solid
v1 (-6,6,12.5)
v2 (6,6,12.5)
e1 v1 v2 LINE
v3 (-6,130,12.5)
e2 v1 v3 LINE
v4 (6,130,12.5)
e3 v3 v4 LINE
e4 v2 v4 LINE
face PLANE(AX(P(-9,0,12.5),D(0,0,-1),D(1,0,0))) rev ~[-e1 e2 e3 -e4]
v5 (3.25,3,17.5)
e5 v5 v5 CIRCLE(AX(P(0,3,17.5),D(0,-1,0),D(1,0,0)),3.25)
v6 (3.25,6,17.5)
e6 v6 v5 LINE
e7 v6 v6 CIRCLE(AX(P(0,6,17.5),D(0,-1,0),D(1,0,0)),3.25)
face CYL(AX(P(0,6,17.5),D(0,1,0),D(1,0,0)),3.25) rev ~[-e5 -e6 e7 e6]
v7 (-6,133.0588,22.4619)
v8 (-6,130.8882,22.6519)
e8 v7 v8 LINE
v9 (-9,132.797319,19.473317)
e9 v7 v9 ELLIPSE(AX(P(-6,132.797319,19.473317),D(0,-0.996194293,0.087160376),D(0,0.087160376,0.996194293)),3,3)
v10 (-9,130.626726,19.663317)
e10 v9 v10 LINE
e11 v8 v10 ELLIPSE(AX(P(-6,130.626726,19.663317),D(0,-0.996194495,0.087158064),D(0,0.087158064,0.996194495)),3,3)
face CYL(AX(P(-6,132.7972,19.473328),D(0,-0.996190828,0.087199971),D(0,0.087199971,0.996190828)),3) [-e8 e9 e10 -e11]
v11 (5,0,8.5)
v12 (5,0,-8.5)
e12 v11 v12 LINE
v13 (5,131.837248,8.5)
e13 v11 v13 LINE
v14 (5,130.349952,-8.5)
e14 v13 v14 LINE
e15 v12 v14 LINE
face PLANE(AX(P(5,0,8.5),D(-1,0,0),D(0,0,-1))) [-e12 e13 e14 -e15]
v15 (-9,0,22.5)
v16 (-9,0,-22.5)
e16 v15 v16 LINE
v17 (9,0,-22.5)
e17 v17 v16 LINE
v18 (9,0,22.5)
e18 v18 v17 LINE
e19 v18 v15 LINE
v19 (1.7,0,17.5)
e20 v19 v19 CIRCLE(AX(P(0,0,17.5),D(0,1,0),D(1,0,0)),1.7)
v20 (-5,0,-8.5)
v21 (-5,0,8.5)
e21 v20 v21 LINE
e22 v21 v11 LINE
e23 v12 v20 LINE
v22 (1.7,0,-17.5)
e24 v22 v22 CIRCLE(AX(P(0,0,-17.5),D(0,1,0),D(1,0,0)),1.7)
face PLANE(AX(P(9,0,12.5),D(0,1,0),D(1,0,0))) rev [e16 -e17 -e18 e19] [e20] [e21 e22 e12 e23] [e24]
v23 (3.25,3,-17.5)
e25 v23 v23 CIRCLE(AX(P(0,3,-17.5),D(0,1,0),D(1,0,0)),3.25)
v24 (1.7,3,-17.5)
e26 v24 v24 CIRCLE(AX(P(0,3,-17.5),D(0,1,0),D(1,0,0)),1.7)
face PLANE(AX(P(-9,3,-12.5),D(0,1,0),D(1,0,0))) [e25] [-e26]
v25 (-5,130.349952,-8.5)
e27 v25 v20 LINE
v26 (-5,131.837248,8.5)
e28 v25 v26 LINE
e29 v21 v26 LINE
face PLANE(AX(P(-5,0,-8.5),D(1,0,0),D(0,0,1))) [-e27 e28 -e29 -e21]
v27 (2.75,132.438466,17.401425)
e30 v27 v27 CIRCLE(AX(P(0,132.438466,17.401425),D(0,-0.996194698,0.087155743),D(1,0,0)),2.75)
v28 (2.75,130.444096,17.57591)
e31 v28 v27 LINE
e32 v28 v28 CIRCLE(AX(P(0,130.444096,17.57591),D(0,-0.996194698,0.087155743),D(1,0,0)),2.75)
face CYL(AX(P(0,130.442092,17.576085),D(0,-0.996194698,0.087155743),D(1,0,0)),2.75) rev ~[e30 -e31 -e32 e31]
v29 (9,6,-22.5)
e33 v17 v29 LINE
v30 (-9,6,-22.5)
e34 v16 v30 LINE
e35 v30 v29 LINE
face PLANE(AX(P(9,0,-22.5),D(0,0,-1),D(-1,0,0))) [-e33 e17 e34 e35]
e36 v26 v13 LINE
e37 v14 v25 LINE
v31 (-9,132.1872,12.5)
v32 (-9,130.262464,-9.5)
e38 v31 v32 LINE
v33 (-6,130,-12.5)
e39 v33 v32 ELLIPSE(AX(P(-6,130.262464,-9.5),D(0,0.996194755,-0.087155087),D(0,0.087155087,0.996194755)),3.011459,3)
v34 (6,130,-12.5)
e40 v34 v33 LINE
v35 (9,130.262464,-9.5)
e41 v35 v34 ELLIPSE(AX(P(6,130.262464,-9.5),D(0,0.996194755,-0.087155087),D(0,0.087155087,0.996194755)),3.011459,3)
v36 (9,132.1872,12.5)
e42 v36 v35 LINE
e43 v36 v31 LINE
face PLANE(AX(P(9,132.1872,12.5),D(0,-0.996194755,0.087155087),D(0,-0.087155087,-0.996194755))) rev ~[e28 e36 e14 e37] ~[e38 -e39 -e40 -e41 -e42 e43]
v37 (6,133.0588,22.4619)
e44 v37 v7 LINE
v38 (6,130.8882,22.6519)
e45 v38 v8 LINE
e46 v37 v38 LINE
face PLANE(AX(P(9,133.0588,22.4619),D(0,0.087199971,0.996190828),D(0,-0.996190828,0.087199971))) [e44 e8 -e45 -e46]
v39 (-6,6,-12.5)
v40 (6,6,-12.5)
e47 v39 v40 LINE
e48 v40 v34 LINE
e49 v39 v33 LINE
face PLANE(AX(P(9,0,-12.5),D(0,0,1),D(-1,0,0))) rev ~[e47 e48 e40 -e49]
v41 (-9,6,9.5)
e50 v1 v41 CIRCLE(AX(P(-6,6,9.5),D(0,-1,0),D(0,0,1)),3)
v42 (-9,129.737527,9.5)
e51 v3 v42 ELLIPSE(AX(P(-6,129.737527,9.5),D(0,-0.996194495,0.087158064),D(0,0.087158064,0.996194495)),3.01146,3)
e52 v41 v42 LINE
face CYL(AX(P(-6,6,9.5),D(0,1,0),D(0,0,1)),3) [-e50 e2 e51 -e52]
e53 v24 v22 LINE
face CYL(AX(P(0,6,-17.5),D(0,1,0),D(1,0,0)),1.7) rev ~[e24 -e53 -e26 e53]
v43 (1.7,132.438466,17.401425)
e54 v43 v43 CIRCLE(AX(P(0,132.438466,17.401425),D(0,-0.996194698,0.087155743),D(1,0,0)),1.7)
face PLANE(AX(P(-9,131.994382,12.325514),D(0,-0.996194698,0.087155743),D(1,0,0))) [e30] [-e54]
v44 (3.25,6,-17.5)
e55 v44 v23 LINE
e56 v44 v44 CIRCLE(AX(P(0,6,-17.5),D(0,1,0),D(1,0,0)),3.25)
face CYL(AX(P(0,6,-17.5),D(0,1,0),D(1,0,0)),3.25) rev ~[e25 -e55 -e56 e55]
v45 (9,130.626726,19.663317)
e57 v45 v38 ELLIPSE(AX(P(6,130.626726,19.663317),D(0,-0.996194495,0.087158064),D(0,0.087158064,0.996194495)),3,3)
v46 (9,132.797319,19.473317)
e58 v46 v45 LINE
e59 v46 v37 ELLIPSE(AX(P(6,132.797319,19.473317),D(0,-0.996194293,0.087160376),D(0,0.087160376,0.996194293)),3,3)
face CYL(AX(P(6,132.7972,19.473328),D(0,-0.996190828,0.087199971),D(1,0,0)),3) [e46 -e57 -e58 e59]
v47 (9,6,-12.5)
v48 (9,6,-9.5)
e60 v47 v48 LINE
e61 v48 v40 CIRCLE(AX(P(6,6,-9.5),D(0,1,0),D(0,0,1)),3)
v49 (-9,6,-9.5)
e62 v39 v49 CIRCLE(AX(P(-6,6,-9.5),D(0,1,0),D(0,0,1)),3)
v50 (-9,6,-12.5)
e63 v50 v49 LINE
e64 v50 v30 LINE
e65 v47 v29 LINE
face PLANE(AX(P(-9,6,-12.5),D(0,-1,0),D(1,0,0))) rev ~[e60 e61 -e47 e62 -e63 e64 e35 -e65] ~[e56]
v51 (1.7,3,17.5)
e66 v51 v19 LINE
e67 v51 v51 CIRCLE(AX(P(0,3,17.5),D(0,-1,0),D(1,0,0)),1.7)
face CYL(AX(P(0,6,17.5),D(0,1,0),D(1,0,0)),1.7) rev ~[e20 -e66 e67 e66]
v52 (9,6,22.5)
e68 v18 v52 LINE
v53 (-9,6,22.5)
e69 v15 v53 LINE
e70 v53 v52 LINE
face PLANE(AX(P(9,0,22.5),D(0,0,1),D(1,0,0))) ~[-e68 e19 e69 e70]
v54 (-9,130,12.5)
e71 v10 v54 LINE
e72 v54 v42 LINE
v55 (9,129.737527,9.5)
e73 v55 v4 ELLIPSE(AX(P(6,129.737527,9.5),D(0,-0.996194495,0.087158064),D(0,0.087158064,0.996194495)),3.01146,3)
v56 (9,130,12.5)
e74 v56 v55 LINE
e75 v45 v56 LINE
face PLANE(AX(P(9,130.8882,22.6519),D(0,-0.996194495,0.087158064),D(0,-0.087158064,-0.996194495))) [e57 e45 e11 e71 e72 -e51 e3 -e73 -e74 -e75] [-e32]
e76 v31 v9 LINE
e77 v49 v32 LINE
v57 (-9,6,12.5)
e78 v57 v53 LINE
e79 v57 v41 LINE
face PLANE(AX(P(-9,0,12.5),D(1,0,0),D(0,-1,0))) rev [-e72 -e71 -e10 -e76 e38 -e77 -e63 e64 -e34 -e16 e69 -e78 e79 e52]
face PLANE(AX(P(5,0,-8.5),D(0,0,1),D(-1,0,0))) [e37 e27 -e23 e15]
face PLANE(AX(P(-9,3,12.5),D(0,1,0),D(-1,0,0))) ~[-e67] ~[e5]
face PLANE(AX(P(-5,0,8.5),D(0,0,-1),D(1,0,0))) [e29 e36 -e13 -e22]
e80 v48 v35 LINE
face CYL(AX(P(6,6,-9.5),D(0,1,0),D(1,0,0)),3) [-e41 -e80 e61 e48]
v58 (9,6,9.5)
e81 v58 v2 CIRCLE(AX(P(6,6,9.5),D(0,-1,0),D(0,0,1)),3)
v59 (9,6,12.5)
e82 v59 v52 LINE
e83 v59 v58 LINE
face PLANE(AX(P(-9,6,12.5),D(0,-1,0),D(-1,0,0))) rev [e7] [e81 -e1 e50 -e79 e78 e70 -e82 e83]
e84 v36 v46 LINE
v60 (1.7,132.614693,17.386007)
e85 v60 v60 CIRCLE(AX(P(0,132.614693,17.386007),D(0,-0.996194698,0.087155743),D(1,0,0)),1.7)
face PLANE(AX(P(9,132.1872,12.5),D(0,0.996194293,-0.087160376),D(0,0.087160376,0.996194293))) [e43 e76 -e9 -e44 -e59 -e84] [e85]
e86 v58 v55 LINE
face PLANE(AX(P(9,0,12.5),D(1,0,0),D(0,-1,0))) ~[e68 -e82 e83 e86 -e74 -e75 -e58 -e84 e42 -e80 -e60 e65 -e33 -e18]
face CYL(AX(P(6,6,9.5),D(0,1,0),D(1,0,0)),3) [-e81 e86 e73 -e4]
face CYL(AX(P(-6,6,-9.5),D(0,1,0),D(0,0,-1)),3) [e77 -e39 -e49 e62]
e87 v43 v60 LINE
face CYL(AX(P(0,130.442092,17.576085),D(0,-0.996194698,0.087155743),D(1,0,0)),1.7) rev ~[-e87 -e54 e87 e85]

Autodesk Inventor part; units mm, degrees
ref_plane "YZ Plane" through (0, 0, 0) normal (1, 0, 0) x (0, 1, 0)
ref_plane "XZ Plane" through (0, 0, 0) normal (0, 1, 0) x (-1, 0, 0)
ref_plane "XY Plane" through (0, 0, 0) normal (0, 0, 1) x (1, 0, 0)
sketch "Sketch2" plane through (0, 0, 0) normal (0, 1, 0) x (-1, 0, 0)
  line L0 (5, 8.5) -> (-5, 8.5)
  line L1 (-5, 8.5) -> (-5, -8.5)
  line L2 (-5, -8.5) -> (5, -8.5)
  line L3 (5, -8.5) -> (5, 8.5)
  line L4 (5, 8.5) -> (-5, -8.5) construction
  line L5 (-5, 8.5) -> (5, -8.5) construction
  line L6 (9, 12.5) -> (-9, 12.5)
  line L7 (-9, 12.5) -> (-9, -12.5)
  line L8 (-9, -12.5) -> (9, -12.5)
  line L9 (9, -12.5) -> (9, 12.5)
  point P0 (0, 0)
  dimension "d0" = 17
  dimension "d1" = 10
  dimension "d2" = 4
extrude "Extrusion1" add sketch "Sketch2" along normal blind 130
sketch "Sketch3" plane through (9, 0, -12.5) normal (0, 0, -1) x (-1, 0, 0)
  line L0 (0, 0) -> (0, 130) projected
  line L1 (18, 0) -> (18, 130) projected
  line L2 (0, 0) -> (18, 0)
  line L3 (18, 0) -> (18, 6)
  line L4 (18, 6) -> (0, 6)
  line L5 (0, 6) -> (0, 0)
  point P0 (9, 0)
  point P1 (0, 6)
  dimension "d5" = 6
extrude "Extrusion2" add sketch "Sketch3" along normal blind 10
sketch "Sketch4" plane through (-9, 6, -12.5) normal (0, 1, 0) x (1, 0, 0)
  circle A0 centre (9, 5) radius 3.25
  circle A1 centre (9, 5) radius 1.7
  line L0 (0, 0) -> (0, 10) projected
  line L1 (0, 10) -> (18, 10) projected
  point P0 (9, -12.5)
  point P1 (0, 5)
  point P2 (9, 10)
  dimension "d8" = 6.5
  dimension "d9" = 3.4
extrude "Extrusion3" cut sketch "Sketch4" against normal blind 10 contours A1
extrude "Extrusion4" cut sketch "Sketch4" against normal blind 3
sketch "Sketch5" plane through (9, 0, 12.5) normal (1, 0, 0) x (0, 0, -1)
  line L0 (0, 0) -> (0, 130) projected
  line L1 (0, 130) -> (0, 132.1872)
  line L2 (25, 130) -> (0, 130) projected
  line L3 (0, 132.1872) -> (25, 130)
  line L4 (0, 132.1872) -> (-9.9619, 133.0588)
  line L5 (-9.9619, 133.0588) -> (-10.1519, 130.8882)
  line L6 (-10.1519, 130.8882) -> (0, 130)
  line L7 (25, 6) -> (25, 130) projected
  point P0 (12.5, 0)
  dimension "d14" = 5
  dimension "d18" = 10
extrude "Extrusion5" add sketch "Sketch5" against normal up to surface (18 mm away)
extrude "Extrusion6" cut sketch "Sketch2" along normal through all contours L3 L2 L1 L0
sketch "Sketch6" plane through (-9, 130, 12.5) normal (0, -0.9961947, 0.0871557) x (1, 0, 0)
  circle A0 centre (9, 5.0953) radius 2.75
  circle A1 centre (9, 5.0953) radius 1.7
  line L0 (0, 10.1906) -> (0, 0) projected
  line L1 (18, 10.1906) -> (0, 10.1906) projected
  point P0 (9, -23.7827)
  point P1 (0, 5.0953)
  point P2 (9, 10.1906)
  dimension "d23" = 5.5
  dimension "d24" = 3.4
extrude "Extrusion7" cut sketch "Sketch6" against normal blind 10 contours A1
extrude "Extrusion8" cut sketch "Sketch6" against normal blind 2
mirror "Mirror1" about plane through (0, 0, 0) normal (0, 0, 1) of "Extrusion2", "Extrusion3", "Extrusion4"
fillet "Fillet1" radius 3 6 edges at (9, 68, -12.5) (-9, 68, -12.5) (9, 68, 12.5) (-9, 68, 12.5) (9, 131.9735, 22.5569) (-9, 131.9735, 22.5569)
properties part number "Path Holder"
